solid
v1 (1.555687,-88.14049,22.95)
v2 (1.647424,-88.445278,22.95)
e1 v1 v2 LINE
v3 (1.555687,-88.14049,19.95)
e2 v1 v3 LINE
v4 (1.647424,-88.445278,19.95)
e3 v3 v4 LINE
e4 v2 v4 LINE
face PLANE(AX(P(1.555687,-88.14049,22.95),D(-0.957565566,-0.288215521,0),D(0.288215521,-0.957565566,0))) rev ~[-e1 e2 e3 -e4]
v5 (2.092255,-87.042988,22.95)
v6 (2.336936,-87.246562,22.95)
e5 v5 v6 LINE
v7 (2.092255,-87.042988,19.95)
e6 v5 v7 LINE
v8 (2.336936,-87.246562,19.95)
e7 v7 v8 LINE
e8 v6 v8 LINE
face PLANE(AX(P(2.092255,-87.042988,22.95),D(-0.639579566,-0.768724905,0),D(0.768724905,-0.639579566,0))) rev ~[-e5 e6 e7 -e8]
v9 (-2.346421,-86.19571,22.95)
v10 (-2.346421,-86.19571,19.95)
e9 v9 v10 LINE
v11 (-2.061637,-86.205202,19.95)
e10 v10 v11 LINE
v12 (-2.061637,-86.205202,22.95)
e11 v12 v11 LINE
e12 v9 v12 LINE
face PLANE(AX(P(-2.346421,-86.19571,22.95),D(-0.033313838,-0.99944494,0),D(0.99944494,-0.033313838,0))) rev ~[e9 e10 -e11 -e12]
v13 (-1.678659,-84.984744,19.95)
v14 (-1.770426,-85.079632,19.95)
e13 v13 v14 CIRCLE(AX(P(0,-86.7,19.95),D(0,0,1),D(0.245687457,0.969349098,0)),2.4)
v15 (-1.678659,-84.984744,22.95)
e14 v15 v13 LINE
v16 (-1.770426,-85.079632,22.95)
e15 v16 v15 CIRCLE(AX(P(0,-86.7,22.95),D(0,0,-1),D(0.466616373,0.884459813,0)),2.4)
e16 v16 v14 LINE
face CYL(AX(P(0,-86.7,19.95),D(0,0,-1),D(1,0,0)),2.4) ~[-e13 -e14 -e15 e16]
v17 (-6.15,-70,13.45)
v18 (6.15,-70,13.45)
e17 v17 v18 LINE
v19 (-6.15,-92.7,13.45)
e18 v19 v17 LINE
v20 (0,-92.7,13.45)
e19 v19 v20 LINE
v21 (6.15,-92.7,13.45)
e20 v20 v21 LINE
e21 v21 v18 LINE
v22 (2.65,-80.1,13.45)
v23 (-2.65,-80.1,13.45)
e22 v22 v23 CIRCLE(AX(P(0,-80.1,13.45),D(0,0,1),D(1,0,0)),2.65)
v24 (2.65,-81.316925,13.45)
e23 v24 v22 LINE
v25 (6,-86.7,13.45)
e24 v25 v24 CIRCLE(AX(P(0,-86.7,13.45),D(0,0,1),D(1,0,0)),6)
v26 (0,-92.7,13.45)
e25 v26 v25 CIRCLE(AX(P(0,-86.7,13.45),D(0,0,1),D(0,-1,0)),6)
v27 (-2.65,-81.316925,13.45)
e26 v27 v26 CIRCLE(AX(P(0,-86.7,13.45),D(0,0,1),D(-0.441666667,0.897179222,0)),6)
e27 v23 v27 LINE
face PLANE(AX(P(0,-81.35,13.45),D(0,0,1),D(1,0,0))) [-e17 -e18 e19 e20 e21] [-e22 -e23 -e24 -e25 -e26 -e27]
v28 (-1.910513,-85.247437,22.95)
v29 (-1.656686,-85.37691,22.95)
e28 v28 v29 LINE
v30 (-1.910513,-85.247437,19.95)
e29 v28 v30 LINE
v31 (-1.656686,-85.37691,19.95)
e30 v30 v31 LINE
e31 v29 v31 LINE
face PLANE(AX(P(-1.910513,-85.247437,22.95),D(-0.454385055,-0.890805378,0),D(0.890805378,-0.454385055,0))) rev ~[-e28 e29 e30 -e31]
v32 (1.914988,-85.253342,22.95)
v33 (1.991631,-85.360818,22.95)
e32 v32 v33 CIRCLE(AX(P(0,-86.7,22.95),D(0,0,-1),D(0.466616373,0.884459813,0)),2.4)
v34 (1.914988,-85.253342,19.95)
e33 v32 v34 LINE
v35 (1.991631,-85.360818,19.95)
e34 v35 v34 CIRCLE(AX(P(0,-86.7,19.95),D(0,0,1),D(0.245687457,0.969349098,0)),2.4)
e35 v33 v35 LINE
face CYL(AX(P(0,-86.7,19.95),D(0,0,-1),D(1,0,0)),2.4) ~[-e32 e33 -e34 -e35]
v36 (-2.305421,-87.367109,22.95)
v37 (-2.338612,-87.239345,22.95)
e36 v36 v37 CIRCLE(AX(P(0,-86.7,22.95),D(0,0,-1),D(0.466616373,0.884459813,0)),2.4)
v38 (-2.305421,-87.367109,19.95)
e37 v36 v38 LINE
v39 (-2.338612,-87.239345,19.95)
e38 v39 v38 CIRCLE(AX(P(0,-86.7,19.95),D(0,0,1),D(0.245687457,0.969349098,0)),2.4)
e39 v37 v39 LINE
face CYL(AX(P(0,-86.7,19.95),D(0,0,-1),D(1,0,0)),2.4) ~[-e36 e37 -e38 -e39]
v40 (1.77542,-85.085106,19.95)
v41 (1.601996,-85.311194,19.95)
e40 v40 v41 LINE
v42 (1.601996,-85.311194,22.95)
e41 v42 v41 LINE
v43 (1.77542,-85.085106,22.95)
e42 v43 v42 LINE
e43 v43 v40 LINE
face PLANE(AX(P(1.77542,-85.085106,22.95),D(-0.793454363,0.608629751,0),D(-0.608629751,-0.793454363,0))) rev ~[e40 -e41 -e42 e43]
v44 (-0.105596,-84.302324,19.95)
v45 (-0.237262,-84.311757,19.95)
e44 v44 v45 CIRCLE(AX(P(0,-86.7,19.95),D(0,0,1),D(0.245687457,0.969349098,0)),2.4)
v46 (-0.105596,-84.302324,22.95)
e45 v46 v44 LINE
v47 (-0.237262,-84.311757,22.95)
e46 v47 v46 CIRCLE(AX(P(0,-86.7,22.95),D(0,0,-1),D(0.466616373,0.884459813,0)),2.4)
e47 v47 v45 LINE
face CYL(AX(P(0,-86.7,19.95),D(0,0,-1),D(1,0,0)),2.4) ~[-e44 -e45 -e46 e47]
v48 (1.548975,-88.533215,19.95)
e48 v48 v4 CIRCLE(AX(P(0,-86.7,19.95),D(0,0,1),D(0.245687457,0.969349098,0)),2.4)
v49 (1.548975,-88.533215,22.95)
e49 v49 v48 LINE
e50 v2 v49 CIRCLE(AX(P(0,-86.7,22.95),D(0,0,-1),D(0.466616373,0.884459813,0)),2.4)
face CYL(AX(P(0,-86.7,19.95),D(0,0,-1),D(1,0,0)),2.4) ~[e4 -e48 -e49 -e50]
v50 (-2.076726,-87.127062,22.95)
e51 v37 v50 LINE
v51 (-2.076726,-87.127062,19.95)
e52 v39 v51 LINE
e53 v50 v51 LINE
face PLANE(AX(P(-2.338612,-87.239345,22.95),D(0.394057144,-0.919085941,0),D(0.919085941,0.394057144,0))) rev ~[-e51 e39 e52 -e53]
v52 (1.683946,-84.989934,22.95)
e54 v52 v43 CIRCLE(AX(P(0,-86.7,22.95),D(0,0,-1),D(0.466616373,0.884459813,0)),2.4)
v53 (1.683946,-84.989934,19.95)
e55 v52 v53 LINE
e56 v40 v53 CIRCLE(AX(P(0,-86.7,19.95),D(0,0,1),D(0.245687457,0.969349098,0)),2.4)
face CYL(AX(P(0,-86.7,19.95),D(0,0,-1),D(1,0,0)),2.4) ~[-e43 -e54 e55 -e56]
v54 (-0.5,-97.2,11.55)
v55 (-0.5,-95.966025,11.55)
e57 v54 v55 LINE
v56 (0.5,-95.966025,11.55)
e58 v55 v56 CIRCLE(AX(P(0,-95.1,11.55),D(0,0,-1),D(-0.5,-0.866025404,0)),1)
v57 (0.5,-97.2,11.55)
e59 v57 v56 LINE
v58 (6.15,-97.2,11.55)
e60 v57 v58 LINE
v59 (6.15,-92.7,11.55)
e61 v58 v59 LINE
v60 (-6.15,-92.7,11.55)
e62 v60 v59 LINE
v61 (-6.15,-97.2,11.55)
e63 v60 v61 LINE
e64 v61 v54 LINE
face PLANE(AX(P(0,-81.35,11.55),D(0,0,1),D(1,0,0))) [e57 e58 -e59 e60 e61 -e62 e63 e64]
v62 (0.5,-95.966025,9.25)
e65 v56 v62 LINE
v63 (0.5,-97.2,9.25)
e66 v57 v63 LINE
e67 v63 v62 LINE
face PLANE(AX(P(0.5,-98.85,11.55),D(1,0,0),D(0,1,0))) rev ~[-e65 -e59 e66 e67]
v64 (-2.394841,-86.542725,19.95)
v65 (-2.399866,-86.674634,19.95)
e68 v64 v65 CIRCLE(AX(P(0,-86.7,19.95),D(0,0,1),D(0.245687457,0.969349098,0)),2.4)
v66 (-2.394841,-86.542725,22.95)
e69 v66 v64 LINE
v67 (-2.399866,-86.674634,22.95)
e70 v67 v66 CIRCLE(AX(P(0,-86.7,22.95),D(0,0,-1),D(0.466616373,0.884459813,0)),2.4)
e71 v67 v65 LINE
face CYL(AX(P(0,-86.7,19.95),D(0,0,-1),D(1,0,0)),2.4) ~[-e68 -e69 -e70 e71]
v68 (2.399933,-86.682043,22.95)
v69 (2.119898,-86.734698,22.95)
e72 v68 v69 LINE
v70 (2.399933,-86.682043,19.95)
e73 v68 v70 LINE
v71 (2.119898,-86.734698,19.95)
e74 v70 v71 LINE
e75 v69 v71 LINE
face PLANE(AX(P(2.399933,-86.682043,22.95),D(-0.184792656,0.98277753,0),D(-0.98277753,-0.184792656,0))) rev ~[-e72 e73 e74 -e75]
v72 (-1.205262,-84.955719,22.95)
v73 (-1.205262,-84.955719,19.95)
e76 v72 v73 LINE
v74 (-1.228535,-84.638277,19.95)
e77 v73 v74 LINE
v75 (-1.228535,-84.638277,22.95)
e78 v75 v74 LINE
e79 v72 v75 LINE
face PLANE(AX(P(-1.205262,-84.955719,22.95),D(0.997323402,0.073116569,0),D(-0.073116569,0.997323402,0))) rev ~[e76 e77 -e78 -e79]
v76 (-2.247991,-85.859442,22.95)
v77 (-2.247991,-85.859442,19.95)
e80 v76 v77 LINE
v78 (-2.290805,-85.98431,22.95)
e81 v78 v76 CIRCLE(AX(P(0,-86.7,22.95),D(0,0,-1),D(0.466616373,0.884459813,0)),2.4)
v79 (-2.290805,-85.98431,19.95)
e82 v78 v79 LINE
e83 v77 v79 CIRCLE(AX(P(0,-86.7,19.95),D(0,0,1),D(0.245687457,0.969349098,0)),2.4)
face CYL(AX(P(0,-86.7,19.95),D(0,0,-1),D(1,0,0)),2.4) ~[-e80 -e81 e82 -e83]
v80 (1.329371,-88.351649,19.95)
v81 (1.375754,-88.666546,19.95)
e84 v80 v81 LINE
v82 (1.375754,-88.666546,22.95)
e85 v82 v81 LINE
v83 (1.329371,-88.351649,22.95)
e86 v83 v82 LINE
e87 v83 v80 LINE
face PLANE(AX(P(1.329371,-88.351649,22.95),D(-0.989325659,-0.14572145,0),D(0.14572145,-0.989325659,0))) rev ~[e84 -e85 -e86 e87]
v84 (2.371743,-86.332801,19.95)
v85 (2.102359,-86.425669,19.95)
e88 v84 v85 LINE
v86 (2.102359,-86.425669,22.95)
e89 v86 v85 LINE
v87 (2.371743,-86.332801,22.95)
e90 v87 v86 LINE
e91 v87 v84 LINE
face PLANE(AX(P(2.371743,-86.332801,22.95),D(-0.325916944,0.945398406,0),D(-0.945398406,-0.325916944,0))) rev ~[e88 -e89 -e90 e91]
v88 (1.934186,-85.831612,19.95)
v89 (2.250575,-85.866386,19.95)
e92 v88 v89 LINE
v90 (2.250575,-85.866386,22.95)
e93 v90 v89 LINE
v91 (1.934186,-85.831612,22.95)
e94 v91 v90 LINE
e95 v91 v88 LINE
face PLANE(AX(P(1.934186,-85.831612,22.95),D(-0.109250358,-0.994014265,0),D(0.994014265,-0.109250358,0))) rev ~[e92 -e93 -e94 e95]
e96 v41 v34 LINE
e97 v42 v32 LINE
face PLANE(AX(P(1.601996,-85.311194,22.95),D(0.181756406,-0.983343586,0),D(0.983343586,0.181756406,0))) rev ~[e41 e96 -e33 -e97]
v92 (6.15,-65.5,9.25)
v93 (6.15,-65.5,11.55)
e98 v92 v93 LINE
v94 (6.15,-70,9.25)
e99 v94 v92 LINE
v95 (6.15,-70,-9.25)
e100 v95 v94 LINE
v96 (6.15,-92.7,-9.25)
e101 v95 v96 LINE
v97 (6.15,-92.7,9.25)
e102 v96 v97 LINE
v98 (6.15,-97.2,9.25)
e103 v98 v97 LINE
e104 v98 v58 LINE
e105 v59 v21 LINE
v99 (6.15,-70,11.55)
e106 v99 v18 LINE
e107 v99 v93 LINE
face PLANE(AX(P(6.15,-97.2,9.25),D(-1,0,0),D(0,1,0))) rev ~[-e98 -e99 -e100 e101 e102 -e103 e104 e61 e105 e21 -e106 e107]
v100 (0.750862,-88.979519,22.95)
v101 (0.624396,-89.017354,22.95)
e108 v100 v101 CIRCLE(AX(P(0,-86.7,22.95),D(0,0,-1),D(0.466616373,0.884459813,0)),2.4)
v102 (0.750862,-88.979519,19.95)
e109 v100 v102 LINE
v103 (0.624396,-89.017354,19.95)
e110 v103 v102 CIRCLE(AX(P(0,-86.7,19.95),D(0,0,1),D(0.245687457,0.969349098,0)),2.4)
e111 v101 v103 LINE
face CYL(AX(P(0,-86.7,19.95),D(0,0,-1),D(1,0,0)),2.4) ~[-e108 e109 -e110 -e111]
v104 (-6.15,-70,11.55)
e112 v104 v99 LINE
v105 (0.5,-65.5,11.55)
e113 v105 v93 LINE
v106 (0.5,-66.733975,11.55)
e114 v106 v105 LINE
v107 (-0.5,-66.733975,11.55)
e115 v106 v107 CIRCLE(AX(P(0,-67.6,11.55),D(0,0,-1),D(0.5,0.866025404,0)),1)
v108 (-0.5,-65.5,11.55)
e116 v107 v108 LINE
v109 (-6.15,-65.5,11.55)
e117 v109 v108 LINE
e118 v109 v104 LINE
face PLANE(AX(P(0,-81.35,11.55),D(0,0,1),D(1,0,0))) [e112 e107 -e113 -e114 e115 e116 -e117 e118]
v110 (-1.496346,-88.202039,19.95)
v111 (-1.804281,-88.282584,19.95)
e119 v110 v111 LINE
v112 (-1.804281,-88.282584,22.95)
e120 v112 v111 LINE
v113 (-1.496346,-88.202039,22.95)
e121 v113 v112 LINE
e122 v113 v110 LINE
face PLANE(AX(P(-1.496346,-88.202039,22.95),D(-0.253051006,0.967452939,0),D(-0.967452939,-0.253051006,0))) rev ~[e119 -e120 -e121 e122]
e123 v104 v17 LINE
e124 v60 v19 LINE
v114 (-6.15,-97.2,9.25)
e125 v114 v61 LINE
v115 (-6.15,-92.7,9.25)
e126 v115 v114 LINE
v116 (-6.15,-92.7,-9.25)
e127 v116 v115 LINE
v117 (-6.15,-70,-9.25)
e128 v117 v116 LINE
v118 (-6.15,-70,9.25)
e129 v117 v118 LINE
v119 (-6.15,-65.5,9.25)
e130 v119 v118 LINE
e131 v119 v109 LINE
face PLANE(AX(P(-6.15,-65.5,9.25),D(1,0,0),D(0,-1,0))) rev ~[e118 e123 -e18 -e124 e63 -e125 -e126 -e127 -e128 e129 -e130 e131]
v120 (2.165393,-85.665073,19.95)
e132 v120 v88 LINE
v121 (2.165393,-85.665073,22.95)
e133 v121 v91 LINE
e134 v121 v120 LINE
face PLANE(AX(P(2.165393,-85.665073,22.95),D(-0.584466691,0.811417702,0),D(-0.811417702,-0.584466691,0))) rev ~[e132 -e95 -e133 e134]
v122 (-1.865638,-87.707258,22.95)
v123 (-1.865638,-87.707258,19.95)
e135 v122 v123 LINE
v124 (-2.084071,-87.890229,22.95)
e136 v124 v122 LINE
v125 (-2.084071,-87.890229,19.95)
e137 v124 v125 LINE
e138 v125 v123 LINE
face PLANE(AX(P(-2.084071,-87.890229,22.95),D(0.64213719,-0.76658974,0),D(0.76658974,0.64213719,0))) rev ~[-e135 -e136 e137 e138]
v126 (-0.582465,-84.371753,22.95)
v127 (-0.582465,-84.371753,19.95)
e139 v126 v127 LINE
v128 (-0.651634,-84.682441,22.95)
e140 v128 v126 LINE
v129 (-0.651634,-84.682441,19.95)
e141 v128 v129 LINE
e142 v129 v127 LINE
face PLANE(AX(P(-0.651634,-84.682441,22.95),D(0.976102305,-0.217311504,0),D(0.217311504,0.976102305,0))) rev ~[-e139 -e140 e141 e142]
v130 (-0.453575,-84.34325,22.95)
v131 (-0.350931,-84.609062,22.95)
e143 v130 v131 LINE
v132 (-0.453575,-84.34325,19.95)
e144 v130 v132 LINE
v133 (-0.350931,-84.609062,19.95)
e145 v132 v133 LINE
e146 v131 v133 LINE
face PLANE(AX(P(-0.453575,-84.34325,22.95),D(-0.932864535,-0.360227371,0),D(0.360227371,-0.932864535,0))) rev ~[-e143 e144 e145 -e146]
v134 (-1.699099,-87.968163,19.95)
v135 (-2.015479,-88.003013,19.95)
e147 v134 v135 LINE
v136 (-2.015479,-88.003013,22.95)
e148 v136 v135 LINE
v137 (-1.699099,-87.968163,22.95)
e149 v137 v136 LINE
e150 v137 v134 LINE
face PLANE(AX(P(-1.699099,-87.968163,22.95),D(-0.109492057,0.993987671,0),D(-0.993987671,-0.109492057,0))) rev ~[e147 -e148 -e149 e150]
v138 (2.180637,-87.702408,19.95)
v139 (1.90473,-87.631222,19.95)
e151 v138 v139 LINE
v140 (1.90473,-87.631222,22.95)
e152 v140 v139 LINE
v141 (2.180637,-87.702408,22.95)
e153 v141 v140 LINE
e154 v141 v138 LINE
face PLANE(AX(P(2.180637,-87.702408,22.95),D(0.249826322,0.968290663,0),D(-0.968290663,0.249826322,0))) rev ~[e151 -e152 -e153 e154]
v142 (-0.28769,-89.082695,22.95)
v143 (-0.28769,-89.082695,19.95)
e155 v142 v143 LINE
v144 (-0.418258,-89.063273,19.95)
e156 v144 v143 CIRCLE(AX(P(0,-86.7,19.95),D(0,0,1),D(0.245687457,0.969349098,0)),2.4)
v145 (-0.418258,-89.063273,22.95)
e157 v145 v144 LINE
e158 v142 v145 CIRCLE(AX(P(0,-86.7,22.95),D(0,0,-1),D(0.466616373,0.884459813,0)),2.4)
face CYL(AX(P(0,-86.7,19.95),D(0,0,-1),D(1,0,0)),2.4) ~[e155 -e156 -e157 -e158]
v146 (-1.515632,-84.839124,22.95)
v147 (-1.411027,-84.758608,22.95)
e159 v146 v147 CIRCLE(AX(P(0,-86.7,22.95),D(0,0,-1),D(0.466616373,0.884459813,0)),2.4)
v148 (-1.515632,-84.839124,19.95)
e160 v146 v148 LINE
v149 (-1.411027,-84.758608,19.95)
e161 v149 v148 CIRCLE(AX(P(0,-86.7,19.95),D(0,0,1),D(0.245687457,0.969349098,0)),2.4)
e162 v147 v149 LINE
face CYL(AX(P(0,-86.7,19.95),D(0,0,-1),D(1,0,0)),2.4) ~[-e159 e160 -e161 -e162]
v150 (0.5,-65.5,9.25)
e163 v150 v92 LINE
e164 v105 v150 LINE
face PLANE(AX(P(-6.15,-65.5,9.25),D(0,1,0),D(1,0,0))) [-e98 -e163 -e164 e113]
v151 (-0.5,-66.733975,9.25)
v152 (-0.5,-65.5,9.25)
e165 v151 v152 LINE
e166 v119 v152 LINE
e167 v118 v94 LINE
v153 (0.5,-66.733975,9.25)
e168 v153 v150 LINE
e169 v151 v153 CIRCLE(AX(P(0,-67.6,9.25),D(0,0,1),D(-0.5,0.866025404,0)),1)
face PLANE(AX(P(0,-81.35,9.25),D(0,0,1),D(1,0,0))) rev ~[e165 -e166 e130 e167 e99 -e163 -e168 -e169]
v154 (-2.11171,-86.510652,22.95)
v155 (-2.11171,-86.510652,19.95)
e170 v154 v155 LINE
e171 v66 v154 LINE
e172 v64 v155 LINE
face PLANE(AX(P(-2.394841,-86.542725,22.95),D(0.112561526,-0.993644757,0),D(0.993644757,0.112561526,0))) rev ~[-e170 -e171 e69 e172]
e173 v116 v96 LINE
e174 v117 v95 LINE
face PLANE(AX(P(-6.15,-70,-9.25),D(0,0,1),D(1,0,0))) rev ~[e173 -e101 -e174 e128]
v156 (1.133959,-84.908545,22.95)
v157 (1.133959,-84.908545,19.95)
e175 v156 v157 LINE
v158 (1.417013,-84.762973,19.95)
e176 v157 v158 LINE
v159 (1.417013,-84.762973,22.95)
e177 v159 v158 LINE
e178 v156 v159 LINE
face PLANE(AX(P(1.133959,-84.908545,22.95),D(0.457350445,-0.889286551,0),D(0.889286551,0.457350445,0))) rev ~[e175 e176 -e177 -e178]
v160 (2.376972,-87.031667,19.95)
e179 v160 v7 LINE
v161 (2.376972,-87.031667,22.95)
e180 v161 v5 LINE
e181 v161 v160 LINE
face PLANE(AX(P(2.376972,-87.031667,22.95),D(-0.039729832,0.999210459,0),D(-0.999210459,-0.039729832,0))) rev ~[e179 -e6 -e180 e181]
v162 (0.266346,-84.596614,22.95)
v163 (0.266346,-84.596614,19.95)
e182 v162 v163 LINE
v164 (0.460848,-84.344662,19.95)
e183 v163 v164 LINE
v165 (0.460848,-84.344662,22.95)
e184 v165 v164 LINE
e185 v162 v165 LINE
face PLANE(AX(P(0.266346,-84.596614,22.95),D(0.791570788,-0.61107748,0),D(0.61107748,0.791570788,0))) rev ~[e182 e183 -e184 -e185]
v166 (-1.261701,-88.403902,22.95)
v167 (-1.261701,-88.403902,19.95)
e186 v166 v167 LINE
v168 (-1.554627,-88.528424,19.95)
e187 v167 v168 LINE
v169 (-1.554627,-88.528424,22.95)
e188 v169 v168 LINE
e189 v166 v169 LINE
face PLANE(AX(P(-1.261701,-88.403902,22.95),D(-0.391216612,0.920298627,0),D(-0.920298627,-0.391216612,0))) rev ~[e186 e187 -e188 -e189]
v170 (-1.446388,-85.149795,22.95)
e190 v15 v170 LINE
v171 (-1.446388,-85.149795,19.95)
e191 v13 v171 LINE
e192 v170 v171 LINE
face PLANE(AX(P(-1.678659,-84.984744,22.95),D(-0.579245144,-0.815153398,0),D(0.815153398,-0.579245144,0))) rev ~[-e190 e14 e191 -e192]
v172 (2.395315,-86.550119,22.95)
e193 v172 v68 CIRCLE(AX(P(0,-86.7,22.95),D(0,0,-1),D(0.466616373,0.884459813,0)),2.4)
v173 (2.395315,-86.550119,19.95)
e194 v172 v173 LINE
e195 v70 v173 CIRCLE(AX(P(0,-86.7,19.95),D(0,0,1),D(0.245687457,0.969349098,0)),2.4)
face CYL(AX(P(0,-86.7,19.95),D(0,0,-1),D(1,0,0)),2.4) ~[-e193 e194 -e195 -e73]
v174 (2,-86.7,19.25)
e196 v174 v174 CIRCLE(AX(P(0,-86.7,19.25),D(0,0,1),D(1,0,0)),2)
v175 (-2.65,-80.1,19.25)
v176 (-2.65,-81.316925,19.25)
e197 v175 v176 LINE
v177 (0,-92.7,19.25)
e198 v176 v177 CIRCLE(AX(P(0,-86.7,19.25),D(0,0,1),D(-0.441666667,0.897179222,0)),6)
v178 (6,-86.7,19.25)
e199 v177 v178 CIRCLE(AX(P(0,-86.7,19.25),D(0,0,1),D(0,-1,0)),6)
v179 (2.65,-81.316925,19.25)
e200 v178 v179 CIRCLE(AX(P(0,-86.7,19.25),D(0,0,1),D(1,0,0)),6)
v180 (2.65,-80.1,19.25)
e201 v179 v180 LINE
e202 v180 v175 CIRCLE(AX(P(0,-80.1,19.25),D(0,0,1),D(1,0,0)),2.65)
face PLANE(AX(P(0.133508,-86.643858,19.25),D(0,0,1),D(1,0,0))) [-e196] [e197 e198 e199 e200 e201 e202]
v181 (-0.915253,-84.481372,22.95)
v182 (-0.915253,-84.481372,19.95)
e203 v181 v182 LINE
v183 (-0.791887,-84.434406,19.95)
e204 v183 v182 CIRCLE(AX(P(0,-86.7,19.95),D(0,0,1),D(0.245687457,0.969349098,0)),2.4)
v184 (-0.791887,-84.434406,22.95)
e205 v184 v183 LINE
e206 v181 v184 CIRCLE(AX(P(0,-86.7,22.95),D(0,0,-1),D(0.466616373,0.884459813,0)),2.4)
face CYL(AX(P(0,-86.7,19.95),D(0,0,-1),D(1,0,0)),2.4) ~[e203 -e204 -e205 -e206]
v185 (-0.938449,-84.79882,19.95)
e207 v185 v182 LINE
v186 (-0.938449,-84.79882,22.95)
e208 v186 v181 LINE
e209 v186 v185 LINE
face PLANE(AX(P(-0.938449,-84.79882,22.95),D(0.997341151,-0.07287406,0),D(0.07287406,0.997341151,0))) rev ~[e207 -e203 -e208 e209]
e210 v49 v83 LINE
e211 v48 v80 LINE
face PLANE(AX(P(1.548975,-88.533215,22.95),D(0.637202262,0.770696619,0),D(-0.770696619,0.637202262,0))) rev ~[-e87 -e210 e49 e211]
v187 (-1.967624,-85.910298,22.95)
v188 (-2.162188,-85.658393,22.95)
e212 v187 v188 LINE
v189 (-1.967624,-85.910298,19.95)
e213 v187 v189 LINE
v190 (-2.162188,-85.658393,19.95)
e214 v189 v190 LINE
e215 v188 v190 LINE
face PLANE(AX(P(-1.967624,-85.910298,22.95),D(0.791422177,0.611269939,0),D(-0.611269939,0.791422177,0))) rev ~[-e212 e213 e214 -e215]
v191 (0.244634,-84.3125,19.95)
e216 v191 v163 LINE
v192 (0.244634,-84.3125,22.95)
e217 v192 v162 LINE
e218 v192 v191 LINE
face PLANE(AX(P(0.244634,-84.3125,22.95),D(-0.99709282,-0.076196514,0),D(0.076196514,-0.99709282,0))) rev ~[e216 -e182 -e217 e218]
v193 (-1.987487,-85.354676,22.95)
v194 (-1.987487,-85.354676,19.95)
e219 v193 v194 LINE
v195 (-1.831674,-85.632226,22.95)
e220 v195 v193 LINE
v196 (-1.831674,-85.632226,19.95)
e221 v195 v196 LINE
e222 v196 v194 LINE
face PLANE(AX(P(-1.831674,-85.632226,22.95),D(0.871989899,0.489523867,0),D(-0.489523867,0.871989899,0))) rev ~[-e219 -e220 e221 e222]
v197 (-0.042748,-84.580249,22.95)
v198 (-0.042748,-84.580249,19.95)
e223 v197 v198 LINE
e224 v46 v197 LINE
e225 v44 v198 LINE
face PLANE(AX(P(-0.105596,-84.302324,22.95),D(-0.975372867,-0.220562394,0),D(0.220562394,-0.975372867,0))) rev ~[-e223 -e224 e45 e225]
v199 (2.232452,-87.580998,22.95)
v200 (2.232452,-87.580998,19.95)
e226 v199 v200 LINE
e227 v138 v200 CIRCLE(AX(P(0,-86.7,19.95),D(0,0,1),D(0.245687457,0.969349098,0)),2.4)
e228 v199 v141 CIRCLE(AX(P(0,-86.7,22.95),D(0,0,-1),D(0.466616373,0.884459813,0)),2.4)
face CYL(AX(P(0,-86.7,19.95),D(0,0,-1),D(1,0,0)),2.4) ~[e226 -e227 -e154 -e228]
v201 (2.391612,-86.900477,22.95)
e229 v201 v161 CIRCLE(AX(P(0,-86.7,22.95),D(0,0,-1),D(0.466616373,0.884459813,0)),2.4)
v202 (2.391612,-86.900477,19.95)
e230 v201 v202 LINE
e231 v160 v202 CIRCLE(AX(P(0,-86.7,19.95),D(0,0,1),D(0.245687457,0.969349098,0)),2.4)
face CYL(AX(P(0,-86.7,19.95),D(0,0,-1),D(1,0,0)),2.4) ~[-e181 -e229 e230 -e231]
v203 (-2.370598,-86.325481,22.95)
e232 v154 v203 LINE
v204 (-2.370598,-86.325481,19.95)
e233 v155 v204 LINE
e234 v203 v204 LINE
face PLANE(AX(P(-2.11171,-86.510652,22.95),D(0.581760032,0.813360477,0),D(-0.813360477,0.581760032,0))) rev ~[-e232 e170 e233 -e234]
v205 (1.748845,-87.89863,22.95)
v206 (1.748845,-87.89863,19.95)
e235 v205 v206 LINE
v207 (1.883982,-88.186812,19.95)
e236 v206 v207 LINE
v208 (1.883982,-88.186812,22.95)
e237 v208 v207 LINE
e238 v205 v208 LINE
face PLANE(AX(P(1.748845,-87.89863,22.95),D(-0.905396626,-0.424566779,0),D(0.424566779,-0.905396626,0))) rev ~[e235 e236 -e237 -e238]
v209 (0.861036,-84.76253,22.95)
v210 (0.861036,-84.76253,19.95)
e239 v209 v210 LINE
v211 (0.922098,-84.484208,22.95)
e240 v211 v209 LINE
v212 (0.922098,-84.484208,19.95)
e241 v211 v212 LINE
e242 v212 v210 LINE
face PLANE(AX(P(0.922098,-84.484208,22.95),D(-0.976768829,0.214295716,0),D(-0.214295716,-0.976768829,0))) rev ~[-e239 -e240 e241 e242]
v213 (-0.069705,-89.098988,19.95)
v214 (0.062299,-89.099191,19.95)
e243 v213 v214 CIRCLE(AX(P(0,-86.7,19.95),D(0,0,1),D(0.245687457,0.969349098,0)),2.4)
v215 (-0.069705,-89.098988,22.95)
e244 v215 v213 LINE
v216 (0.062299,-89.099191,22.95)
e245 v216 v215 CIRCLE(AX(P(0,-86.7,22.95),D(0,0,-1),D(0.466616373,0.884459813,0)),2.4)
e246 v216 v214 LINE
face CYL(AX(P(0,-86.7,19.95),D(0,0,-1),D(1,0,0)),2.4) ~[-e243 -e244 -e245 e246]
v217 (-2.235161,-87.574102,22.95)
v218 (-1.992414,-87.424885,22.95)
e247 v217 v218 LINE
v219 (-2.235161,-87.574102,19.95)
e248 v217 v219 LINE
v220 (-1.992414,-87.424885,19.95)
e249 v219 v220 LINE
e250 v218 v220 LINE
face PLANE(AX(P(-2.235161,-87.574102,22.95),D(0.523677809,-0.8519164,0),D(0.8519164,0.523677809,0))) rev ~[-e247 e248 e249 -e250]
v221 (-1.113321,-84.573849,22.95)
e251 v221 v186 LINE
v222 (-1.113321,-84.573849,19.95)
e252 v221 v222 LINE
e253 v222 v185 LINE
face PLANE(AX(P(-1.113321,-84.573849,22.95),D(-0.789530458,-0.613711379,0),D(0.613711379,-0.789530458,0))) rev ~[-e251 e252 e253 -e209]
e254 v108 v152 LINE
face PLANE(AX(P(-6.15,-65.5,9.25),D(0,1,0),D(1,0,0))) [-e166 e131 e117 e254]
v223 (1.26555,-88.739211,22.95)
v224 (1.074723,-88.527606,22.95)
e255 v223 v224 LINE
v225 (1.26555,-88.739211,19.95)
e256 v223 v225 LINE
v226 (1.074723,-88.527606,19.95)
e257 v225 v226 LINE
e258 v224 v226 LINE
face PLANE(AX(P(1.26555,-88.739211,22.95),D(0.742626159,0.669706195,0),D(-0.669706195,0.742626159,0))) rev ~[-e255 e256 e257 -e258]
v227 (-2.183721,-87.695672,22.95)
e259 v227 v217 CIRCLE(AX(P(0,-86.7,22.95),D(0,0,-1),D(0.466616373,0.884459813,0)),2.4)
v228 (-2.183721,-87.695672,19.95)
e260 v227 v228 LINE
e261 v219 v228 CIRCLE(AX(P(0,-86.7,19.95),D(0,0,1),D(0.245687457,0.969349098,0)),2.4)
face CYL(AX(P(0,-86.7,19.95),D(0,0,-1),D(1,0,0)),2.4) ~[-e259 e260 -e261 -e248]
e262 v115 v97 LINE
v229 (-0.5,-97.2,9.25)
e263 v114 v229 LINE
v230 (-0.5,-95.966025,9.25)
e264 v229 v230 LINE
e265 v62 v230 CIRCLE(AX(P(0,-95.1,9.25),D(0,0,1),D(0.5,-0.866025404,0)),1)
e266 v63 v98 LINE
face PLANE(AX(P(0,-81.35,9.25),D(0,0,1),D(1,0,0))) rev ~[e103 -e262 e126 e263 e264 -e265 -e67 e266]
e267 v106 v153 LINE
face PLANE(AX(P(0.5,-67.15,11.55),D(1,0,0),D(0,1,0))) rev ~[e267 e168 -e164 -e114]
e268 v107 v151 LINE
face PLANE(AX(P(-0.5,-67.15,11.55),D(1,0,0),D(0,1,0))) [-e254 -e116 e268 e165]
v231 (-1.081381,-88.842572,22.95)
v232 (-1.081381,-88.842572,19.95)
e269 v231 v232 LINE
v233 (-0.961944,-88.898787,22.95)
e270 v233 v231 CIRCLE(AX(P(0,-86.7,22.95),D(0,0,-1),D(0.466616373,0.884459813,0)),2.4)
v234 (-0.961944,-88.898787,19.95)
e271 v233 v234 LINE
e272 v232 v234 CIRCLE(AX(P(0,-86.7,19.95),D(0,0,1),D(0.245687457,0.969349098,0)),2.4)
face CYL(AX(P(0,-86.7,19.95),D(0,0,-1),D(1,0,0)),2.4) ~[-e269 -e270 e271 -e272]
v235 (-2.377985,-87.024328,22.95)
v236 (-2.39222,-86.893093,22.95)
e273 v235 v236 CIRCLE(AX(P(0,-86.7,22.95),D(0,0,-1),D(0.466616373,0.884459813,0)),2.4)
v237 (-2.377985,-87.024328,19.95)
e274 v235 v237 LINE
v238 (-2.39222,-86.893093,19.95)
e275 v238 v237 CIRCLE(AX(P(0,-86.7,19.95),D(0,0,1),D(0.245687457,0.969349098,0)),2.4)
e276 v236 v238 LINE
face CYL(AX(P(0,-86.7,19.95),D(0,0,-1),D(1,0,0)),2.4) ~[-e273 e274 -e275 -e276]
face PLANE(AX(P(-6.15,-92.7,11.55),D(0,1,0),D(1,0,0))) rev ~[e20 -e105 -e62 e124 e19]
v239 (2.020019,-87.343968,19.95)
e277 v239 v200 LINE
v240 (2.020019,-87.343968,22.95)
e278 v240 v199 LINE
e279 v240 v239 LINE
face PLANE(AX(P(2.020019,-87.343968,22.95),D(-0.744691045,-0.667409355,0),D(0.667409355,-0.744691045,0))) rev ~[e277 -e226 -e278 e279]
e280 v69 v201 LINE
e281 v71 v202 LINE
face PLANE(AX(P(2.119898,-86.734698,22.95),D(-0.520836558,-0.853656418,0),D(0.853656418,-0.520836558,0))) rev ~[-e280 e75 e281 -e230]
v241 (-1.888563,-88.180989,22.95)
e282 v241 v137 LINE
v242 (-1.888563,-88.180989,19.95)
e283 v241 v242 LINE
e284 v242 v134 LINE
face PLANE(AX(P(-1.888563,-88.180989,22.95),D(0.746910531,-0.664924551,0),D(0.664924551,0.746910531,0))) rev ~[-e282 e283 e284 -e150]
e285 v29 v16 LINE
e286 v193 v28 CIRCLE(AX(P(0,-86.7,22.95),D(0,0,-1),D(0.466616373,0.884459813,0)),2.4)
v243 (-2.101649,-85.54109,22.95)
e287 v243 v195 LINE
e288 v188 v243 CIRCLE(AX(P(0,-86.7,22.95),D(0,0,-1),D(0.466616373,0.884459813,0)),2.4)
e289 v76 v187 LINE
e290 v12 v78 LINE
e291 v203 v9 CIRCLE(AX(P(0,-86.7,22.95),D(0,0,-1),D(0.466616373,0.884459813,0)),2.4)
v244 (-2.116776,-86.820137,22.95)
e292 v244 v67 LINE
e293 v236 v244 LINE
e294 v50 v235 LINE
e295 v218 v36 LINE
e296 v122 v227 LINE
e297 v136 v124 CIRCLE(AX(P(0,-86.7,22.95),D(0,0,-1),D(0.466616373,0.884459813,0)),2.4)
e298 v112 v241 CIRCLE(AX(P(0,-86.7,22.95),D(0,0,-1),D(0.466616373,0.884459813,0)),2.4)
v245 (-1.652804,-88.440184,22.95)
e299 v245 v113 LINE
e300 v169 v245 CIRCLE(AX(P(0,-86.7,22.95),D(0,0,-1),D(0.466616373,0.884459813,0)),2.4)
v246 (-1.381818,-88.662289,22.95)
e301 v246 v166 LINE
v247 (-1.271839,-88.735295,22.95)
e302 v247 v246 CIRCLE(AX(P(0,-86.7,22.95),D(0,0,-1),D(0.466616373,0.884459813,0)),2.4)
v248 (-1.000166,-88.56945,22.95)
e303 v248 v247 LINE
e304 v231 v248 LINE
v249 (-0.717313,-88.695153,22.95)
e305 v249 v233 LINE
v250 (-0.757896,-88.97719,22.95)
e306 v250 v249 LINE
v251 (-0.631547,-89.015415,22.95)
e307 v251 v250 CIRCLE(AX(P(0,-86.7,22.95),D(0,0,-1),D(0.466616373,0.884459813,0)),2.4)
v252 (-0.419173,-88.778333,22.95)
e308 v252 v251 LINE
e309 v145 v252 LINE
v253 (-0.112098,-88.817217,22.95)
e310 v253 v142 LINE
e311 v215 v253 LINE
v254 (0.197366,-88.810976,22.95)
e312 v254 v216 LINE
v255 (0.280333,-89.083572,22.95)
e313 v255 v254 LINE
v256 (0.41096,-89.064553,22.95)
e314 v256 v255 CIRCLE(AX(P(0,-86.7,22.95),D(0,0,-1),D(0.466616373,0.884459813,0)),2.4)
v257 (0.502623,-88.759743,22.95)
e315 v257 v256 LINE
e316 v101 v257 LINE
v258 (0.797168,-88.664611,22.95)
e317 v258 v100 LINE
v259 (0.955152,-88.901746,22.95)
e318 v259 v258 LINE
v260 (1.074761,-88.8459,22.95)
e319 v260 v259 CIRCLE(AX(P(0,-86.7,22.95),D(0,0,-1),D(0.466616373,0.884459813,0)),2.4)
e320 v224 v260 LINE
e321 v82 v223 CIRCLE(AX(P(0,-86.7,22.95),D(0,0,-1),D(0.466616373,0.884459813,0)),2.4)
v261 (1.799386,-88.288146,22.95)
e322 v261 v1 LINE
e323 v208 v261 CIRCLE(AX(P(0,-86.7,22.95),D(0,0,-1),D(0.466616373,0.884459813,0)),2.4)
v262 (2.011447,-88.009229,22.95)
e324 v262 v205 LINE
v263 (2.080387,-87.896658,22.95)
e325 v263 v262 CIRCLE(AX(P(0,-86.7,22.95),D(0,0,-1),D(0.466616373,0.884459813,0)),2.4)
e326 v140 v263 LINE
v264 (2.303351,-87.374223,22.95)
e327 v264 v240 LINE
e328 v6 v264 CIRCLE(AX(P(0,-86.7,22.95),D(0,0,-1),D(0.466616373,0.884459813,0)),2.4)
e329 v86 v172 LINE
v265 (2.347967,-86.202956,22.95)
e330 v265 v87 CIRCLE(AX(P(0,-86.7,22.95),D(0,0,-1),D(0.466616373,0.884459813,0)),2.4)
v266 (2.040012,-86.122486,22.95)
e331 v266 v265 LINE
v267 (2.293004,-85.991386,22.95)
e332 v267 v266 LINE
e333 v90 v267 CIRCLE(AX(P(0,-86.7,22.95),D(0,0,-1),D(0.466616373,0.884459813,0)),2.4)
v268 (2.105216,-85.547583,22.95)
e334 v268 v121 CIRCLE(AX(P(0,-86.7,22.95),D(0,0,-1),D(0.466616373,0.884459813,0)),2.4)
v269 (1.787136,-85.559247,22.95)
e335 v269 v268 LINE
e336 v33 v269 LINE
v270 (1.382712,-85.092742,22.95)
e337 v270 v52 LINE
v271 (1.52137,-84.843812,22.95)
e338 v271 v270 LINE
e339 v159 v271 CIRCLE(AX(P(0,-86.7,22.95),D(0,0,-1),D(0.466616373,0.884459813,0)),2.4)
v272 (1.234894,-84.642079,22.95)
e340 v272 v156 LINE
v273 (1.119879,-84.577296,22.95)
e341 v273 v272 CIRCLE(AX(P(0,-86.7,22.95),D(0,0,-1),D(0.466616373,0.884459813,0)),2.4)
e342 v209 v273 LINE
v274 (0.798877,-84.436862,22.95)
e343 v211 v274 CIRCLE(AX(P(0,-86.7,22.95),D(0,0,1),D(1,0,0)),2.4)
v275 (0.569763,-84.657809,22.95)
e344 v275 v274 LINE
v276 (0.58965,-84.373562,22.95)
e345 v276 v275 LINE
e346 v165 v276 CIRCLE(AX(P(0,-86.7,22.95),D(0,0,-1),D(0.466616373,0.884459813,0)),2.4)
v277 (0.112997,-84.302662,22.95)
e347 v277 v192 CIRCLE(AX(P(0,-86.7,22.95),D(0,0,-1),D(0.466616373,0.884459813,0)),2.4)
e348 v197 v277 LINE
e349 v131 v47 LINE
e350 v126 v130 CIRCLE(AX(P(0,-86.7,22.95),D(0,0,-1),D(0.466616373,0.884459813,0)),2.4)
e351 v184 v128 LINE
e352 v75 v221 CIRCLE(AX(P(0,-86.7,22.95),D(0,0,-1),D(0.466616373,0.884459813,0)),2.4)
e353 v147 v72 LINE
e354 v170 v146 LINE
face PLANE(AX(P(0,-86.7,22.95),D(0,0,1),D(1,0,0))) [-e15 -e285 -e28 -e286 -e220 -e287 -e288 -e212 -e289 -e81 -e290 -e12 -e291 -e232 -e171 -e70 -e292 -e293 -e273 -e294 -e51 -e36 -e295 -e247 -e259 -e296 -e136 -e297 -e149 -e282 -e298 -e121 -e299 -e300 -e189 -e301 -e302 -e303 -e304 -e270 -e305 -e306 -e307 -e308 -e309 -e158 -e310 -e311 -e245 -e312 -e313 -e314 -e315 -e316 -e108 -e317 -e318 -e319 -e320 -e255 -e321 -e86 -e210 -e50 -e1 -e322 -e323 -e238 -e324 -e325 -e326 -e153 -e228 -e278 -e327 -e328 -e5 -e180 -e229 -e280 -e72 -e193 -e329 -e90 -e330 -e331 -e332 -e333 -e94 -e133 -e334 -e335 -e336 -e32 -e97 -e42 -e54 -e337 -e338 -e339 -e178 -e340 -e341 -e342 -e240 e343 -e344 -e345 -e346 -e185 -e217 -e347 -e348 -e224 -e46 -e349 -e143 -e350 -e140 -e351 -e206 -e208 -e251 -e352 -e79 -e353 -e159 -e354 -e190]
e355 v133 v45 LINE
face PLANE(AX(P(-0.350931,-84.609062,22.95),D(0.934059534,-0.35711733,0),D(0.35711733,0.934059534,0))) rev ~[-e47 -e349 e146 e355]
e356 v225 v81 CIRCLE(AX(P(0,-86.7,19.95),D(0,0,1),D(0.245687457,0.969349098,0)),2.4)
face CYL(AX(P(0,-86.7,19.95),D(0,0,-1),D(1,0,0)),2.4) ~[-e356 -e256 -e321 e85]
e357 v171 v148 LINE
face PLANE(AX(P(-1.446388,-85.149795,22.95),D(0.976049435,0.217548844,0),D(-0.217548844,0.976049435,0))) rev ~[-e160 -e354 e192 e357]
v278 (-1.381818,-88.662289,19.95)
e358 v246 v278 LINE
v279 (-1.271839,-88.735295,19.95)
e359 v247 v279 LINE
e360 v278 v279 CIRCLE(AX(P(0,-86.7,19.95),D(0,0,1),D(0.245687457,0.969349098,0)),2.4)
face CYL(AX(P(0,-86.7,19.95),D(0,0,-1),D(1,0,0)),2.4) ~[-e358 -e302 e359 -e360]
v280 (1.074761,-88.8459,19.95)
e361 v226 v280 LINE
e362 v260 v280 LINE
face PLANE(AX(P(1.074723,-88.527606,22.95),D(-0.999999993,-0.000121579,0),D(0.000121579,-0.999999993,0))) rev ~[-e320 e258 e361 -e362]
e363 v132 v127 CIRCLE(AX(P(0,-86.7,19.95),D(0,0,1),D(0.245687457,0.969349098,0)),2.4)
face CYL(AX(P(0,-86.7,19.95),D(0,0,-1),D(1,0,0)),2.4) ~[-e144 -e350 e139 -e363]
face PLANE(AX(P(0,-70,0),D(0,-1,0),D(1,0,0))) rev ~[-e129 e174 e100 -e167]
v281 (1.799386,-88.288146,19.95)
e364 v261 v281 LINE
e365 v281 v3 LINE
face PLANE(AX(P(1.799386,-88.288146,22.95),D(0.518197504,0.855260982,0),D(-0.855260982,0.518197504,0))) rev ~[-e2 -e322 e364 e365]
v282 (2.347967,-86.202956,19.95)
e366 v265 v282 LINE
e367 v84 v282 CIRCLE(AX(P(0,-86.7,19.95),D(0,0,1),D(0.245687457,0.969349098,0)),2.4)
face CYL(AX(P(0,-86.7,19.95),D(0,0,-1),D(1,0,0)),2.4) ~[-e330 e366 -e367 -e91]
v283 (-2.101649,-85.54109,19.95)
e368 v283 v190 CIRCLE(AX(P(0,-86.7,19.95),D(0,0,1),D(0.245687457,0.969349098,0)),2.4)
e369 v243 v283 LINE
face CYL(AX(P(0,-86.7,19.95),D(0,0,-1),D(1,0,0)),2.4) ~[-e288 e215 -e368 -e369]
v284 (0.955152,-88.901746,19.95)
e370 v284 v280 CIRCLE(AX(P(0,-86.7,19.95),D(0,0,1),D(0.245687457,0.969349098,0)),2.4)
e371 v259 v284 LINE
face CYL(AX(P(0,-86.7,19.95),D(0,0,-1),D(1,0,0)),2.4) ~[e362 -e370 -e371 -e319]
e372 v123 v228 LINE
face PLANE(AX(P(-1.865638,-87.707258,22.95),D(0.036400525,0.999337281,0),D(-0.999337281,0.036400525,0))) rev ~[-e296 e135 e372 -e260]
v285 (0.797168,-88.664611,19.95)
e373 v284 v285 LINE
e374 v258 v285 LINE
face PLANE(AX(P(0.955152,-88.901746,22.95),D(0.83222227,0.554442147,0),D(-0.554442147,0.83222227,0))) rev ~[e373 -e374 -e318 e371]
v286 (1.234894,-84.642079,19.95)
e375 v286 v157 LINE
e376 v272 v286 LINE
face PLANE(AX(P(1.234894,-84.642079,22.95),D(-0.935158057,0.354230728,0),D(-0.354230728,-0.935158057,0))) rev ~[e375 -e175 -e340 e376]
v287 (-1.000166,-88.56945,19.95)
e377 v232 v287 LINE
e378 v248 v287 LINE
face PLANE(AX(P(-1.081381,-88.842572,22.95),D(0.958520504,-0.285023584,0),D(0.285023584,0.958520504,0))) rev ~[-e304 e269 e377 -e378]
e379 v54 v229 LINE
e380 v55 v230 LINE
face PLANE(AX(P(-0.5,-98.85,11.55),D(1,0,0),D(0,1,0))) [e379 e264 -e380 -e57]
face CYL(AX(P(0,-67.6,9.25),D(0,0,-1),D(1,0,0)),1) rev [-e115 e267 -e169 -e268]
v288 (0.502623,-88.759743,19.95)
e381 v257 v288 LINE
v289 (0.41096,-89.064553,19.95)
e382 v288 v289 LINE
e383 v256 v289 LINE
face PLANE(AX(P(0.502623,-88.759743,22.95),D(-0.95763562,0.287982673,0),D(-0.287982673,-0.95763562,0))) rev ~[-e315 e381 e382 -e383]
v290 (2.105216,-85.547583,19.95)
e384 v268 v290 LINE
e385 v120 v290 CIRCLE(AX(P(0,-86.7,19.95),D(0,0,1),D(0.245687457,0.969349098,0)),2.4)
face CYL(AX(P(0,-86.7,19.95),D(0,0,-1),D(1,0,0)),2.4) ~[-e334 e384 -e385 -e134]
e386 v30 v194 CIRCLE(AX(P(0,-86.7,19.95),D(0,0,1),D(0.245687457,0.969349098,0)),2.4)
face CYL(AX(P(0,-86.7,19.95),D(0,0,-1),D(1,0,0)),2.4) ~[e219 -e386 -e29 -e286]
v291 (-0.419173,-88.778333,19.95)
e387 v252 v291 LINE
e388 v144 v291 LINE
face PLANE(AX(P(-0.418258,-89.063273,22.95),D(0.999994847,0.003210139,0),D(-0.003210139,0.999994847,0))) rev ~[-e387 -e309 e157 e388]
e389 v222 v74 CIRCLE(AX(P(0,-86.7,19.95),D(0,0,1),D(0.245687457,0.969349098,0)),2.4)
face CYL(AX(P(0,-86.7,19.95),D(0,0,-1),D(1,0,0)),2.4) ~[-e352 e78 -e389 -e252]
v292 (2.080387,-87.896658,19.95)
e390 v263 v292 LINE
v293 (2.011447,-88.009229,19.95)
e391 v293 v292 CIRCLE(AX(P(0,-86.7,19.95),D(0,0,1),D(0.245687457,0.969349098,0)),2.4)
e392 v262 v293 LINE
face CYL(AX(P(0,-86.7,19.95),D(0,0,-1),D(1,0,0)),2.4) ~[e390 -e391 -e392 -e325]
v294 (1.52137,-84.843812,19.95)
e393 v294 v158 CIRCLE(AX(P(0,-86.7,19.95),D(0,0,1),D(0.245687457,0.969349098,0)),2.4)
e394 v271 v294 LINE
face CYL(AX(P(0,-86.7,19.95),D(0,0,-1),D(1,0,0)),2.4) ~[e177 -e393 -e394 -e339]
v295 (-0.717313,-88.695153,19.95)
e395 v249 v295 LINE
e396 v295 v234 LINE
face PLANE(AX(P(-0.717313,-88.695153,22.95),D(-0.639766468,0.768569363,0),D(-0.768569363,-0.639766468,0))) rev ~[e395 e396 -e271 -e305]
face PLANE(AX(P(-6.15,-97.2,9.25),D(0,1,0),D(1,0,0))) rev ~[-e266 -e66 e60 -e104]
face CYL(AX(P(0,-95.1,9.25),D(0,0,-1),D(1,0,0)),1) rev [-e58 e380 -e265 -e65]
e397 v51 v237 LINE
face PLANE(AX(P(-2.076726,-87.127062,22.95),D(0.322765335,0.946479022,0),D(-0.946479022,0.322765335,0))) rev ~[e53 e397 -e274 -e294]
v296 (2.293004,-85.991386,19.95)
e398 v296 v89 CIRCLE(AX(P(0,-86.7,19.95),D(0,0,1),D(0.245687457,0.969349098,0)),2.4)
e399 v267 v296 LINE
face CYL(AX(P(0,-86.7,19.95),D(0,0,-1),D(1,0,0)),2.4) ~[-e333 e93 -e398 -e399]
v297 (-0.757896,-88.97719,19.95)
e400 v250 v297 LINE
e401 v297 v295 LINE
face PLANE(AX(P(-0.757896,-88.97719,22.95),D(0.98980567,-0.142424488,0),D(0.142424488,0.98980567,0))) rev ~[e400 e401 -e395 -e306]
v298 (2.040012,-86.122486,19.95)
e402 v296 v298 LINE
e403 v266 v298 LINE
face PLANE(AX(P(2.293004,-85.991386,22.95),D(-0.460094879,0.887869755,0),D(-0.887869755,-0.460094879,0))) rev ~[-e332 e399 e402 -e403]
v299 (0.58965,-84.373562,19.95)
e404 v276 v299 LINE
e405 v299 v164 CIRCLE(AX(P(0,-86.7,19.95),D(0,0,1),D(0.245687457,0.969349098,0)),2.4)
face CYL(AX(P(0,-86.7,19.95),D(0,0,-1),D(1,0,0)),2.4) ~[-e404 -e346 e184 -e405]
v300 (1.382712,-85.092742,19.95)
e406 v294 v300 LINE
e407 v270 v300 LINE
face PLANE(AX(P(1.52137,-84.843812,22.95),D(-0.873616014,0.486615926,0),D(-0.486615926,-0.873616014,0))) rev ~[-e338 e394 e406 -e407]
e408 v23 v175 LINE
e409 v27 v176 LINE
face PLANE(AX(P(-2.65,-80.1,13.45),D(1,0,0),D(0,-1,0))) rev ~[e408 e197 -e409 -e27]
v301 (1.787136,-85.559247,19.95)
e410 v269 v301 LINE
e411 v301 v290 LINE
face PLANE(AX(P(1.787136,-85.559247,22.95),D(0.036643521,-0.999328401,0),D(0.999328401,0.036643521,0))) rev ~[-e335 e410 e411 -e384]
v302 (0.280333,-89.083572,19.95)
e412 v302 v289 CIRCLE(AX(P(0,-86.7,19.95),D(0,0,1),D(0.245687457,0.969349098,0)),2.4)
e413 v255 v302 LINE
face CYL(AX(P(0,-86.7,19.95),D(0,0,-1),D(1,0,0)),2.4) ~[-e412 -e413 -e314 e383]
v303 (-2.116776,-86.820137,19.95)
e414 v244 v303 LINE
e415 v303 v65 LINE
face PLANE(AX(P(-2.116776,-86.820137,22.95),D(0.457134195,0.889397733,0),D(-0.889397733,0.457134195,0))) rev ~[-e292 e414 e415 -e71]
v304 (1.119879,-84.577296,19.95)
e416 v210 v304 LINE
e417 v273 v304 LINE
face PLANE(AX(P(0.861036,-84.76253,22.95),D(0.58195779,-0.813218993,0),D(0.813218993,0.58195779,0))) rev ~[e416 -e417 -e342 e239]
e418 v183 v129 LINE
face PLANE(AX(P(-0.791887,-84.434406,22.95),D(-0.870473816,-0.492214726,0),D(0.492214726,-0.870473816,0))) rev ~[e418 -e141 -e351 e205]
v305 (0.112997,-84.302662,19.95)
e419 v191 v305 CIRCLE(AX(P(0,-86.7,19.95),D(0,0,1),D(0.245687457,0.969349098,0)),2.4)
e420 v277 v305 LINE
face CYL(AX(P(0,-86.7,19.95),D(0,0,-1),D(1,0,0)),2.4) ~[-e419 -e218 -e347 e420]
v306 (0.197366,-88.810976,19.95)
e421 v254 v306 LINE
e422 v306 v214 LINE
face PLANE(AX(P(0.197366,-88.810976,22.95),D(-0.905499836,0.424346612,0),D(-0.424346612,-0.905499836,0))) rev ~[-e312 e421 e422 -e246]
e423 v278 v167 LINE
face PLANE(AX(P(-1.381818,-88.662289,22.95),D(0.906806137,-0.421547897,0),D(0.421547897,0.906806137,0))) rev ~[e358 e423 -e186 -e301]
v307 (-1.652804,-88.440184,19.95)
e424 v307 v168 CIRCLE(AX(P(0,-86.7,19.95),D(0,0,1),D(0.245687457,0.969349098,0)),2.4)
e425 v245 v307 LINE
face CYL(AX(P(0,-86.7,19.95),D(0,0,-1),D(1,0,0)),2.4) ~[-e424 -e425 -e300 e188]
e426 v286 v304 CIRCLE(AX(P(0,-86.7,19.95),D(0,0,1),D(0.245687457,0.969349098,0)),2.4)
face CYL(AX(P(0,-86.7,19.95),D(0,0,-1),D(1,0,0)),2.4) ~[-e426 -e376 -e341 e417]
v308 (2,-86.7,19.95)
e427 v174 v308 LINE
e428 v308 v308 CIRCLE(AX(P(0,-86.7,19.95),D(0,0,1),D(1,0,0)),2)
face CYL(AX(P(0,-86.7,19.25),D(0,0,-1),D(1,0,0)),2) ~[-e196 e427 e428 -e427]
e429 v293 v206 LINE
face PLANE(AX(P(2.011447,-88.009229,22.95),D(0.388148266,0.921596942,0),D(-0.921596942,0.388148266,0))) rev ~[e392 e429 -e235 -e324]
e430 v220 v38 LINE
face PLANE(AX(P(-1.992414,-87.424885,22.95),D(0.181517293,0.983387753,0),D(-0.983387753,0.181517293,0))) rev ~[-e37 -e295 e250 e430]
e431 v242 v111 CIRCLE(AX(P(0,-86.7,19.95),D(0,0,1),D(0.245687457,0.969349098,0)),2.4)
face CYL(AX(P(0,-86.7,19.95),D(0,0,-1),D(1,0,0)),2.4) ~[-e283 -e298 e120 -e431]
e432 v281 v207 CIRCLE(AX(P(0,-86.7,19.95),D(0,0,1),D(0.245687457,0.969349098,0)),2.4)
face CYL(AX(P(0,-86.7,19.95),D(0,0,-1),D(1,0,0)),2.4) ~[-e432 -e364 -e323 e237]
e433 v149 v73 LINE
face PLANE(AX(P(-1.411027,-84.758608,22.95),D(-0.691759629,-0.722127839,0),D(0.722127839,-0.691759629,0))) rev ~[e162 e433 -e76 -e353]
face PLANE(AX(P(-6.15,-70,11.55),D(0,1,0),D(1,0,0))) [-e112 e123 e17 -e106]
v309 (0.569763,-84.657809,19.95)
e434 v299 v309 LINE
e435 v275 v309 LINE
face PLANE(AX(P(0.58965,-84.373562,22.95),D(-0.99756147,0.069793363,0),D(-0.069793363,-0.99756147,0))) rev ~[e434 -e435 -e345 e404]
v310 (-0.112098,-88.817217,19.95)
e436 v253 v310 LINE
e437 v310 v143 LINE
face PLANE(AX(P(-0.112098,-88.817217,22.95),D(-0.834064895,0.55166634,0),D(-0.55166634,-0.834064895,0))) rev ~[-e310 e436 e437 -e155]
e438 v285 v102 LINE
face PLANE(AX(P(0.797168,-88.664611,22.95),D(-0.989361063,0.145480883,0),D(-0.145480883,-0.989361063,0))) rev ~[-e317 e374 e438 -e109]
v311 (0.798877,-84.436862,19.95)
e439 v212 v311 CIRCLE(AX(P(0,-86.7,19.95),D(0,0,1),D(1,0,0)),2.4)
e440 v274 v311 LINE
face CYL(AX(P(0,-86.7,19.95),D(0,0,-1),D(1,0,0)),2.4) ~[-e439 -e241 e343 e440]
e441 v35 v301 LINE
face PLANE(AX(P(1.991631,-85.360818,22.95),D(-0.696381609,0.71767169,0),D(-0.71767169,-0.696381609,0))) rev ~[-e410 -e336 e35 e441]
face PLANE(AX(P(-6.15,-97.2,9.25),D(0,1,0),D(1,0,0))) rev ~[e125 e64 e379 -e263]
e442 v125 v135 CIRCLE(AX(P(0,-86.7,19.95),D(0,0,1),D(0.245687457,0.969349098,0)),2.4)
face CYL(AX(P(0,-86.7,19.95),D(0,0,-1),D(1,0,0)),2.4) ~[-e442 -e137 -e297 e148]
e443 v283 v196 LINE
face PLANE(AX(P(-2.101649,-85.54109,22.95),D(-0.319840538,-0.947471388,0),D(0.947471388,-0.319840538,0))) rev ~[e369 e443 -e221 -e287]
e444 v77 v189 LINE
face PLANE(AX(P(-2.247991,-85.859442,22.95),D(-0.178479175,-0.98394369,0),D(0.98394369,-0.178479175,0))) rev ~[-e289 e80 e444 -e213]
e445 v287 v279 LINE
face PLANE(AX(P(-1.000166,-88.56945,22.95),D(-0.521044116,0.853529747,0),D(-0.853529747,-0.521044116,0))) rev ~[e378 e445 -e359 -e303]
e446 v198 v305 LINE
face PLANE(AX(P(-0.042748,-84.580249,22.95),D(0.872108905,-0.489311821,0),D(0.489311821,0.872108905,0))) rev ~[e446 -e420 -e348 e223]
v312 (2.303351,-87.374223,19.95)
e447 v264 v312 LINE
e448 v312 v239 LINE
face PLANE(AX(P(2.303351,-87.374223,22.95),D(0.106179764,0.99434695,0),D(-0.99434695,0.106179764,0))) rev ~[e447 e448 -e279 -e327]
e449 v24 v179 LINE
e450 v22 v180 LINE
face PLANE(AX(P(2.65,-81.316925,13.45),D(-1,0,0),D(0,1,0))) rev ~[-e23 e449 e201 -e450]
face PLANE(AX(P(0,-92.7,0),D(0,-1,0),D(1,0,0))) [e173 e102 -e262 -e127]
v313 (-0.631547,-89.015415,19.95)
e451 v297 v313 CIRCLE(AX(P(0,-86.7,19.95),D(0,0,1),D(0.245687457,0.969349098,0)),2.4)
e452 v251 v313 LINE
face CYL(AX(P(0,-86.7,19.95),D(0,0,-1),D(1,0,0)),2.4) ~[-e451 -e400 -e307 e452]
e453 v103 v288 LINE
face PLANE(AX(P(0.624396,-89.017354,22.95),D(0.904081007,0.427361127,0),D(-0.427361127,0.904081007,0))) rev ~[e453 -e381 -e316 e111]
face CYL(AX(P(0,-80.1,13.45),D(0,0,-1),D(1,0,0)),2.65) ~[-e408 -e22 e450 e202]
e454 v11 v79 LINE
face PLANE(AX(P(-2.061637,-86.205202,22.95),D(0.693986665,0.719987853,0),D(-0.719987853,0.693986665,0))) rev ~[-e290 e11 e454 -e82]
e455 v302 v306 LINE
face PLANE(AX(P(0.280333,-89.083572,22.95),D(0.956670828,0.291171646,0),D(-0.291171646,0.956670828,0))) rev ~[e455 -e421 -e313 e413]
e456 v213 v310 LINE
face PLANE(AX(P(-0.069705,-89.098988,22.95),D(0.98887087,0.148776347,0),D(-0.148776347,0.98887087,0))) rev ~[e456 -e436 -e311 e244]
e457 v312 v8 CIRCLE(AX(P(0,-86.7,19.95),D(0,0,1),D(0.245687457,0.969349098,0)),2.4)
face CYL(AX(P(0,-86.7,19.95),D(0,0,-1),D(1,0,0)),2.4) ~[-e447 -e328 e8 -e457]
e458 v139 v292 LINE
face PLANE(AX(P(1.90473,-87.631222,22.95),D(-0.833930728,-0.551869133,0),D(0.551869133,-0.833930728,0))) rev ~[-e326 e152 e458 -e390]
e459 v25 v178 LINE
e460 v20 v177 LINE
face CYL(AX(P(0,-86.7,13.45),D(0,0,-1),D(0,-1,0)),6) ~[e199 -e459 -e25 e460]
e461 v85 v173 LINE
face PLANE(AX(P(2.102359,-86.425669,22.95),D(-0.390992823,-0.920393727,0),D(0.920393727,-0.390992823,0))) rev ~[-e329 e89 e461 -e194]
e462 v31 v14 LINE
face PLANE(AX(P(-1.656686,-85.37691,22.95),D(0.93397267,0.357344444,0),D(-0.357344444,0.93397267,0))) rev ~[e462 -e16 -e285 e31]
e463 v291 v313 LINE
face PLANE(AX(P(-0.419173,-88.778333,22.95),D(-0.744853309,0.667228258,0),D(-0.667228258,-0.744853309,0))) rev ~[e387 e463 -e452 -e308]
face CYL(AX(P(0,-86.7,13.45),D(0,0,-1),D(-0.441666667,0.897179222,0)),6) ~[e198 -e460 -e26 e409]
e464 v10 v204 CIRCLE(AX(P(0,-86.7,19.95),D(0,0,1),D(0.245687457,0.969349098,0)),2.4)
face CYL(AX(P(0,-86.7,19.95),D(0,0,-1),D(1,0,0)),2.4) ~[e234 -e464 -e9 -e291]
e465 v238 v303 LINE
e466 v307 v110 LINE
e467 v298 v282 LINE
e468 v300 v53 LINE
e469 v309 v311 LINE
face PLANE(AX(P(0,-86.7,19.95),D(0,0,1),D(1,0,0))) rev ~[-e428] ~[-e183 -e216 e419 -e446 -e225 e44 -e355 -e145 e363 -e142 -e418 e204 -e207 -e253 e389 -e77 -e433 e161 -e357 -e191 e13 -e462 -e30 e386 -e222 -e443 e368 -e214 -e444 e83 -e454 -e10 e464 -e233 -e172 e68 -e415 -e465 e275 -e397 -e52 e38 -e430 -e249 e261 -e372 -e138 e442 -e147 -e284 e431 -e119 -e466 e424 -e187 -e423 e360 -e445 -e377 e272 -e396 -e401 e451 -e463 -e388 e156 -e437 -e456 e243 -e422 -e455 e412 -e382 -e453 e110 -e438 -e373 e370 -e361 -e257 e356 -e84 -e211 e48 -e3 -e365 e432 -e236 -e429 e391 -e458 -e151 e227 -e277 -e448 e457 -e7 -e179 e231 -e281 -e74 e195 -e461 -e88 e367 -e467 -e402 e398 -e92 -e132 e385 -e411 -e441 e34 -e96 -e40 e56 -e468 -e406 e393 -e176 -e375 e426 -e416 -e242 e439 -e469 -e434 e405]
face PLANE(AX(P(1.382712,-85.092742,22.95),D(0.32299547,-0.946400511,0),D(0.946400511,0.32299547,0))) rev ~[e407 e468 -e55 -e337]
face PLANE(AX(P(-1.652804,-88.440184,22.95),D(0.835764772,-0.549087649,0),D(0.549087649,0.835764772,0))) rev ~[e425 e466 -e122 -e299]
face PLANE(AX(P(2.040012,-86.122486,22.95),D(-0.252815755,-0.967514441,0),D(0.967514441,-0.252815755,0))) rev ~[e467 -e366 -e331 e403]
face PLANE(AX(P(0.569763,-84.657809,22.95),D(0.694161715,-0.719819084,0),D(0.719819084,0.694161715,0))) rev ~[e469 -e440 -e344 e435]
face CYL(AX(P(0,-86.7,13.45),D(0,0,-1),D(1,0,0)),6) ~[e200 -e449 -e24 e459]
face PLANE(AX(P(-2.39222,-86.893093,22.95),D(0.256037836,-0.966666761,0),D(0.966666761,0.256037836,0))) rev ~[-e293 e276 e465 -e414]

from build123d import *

# Parameters (mm, degrees)
F1_W      = 12.3
F1_H      = 18.5
F2_DEPTH  = 22.7
F3_W      = 12.3
F3_H      = 22.7
F3_H_2    = 4.5
F3_R      = 1
F4_DEPTH  = 2.3
F5_W      = 1
F5_H      = 3.3
F6_DEPTH  = 20.801
F7_W      = 12.3
F7_H      = 22.7
F8_DEPTH  = 1.9
F10_DEPTH = 5.8
F11_R     = 2
F12_DEPTH = 0.7
F13_R     = 2.4
F13_R_2   = 2
F14_DEPTH = 3
F16_DEPTH = 3.7
F17_COUNT = 43


# Not quite as in the source:
# - a feature names something its author has since deleted; it is built from what else it names


with BuildPart() as f2:
    # F1 (on offset) → F2 (new body)
    with BuildSketch(Plane.XZ.offset(70)):
        Rectangle(F1_W, F1_H)
    extrude(amount=F2_DEPTH)

    # F3 (on face) → F4 (join)
    with BuildSketch(Plane.XY.offset(9.25)):
        with Locations((0, -81.35)):
            Rectangle(F3_W, F3_H)
        with Locations((0, -67.75)):
            Rectangle(F3_W, F3_H_2)
        with Locations((0, -67.6)):
            Circle(F3_R, mode=Mode.SUBTRACT)
        with Locations((0, -94.95)):
            Rectangle(F3_W, F3_H_2)
        with Locations((0, -95.1)):
            Circle(F3_R, mode=Mode.SUBTRACT)
    extrude(amount=F4_DEPTH)

    # F5 (on face) → F6 (cut, through all)
    with BuildSketch(Plane.XY.offset(11.55)):
        with Locations((0, -65.5)):
            Rectangle(F5_W, F5_H)
        with Locations((0, -97.2)):
            Rectangle(F5_W, F5_H)
    extrude(amount=-F6_DEPTH, mode=Mode.SUBTRACT)

    # F7 (on face) → F8 (join)
    with BuildSketch(Plane.XY.offset(11.55)):
        with Locations((0, -81.35)):
            Rectangle(F7_W, F7_H)
    extrude(amount=F8_DEPTH)

    # F9 (on face) → F10 (join)
    with BuildSketch(Plane.XY.offset(13.45)):
        with BuildLine():
            ThreePointArc((0, -92.7), (4.2426406871, -90.9426406871), (6, -86.7))
            ThreePointArc((6, -86.7), (5.0941142508, -83.5298265032), (2.65, -81.3169246708))
            ThreePointArc((2.65, -81.3169246708), (0, -80.7), (-2.65, -81.3169246708))
            ThreePointArc((-2.65, -81.3169246708), (-5.843733908, -88.0604315537), (0, -92.7))
        make_face()
        with BuildLine():
            ThreePointArc((-2.65, -81.3169246708), (0, -80.7), (2.65, -81.3169246708))
            Line((2.65, -81.3169246708), (2.65, -80.1))
            ThreePointArc((2.65, -80.1), (0, -77.45), (-2.65, -80.1))
            Line((-2.65, -80.1), (-2.65, -81.3169246708))
        make_face()
    extrude(amount=F10_DEPTH)



with BuildPart() as f12:
    # F11 (on face) → F12 (new body)
    with BuildSketch(Plane.XY.offset(19.25)):
        with Locations((0, -86.7)):
            Circle(F11_R)
    extrude(amount=F12_DEPTH)


with BuildPart() as f2_1:
    add(f2.part)

    add(f12.part)  # F14 merges F12
    # F13 (on face) → F14 (join)
    with BuildSketch(Plane.XY.offset(19.95)):
        with Locations((0, -86.7)):
            Circle(F13_R)
        with Locations((0, -86.7)):
            Circle(F13_R_2, mode=Mode.SUBTRACT)
        with Locations((0, -86.7)):
            Circle(F13_R_2)
    extrude(amount=F14_DEPTH)

    # F17: F16 ×43 about axis
    f17_axis = Axis((0, -86.7, 22.95), (0, 0, 1))


with BuildPart() as f16:
    # F15 (on face) → F16 (new body, through all)
    with BuildSketch(Plane.XY.offset(22.95)):
        with BuildLine():
            ThreePointArc((1.4170132697, -84.7629730529), (1.3273305991, -84.7004516808), (1.2348937398, -84.6420793379))
            Line((1.2348937398, -84.6420793379), (1.1339585762, -84.9085450172))
            Line((1.1339585762, -84.9085450172), (1.4170132697, -84.7629730529))
        make_face()
    extrude(amount=-F16_DEPTH)


with BuildPart() as f2_2:
    add(f2_1.part)
    for i in range(1, F17_COUNT):
        add(f16.part.rotate(f17_axis, i * 360 / F17_COUNT), mode=Mode.SUBTRACT)

    # F17#seed: cut F16
    add(f16.part, mode=Mode.SUBTRACT)


solid = f2_2.part
